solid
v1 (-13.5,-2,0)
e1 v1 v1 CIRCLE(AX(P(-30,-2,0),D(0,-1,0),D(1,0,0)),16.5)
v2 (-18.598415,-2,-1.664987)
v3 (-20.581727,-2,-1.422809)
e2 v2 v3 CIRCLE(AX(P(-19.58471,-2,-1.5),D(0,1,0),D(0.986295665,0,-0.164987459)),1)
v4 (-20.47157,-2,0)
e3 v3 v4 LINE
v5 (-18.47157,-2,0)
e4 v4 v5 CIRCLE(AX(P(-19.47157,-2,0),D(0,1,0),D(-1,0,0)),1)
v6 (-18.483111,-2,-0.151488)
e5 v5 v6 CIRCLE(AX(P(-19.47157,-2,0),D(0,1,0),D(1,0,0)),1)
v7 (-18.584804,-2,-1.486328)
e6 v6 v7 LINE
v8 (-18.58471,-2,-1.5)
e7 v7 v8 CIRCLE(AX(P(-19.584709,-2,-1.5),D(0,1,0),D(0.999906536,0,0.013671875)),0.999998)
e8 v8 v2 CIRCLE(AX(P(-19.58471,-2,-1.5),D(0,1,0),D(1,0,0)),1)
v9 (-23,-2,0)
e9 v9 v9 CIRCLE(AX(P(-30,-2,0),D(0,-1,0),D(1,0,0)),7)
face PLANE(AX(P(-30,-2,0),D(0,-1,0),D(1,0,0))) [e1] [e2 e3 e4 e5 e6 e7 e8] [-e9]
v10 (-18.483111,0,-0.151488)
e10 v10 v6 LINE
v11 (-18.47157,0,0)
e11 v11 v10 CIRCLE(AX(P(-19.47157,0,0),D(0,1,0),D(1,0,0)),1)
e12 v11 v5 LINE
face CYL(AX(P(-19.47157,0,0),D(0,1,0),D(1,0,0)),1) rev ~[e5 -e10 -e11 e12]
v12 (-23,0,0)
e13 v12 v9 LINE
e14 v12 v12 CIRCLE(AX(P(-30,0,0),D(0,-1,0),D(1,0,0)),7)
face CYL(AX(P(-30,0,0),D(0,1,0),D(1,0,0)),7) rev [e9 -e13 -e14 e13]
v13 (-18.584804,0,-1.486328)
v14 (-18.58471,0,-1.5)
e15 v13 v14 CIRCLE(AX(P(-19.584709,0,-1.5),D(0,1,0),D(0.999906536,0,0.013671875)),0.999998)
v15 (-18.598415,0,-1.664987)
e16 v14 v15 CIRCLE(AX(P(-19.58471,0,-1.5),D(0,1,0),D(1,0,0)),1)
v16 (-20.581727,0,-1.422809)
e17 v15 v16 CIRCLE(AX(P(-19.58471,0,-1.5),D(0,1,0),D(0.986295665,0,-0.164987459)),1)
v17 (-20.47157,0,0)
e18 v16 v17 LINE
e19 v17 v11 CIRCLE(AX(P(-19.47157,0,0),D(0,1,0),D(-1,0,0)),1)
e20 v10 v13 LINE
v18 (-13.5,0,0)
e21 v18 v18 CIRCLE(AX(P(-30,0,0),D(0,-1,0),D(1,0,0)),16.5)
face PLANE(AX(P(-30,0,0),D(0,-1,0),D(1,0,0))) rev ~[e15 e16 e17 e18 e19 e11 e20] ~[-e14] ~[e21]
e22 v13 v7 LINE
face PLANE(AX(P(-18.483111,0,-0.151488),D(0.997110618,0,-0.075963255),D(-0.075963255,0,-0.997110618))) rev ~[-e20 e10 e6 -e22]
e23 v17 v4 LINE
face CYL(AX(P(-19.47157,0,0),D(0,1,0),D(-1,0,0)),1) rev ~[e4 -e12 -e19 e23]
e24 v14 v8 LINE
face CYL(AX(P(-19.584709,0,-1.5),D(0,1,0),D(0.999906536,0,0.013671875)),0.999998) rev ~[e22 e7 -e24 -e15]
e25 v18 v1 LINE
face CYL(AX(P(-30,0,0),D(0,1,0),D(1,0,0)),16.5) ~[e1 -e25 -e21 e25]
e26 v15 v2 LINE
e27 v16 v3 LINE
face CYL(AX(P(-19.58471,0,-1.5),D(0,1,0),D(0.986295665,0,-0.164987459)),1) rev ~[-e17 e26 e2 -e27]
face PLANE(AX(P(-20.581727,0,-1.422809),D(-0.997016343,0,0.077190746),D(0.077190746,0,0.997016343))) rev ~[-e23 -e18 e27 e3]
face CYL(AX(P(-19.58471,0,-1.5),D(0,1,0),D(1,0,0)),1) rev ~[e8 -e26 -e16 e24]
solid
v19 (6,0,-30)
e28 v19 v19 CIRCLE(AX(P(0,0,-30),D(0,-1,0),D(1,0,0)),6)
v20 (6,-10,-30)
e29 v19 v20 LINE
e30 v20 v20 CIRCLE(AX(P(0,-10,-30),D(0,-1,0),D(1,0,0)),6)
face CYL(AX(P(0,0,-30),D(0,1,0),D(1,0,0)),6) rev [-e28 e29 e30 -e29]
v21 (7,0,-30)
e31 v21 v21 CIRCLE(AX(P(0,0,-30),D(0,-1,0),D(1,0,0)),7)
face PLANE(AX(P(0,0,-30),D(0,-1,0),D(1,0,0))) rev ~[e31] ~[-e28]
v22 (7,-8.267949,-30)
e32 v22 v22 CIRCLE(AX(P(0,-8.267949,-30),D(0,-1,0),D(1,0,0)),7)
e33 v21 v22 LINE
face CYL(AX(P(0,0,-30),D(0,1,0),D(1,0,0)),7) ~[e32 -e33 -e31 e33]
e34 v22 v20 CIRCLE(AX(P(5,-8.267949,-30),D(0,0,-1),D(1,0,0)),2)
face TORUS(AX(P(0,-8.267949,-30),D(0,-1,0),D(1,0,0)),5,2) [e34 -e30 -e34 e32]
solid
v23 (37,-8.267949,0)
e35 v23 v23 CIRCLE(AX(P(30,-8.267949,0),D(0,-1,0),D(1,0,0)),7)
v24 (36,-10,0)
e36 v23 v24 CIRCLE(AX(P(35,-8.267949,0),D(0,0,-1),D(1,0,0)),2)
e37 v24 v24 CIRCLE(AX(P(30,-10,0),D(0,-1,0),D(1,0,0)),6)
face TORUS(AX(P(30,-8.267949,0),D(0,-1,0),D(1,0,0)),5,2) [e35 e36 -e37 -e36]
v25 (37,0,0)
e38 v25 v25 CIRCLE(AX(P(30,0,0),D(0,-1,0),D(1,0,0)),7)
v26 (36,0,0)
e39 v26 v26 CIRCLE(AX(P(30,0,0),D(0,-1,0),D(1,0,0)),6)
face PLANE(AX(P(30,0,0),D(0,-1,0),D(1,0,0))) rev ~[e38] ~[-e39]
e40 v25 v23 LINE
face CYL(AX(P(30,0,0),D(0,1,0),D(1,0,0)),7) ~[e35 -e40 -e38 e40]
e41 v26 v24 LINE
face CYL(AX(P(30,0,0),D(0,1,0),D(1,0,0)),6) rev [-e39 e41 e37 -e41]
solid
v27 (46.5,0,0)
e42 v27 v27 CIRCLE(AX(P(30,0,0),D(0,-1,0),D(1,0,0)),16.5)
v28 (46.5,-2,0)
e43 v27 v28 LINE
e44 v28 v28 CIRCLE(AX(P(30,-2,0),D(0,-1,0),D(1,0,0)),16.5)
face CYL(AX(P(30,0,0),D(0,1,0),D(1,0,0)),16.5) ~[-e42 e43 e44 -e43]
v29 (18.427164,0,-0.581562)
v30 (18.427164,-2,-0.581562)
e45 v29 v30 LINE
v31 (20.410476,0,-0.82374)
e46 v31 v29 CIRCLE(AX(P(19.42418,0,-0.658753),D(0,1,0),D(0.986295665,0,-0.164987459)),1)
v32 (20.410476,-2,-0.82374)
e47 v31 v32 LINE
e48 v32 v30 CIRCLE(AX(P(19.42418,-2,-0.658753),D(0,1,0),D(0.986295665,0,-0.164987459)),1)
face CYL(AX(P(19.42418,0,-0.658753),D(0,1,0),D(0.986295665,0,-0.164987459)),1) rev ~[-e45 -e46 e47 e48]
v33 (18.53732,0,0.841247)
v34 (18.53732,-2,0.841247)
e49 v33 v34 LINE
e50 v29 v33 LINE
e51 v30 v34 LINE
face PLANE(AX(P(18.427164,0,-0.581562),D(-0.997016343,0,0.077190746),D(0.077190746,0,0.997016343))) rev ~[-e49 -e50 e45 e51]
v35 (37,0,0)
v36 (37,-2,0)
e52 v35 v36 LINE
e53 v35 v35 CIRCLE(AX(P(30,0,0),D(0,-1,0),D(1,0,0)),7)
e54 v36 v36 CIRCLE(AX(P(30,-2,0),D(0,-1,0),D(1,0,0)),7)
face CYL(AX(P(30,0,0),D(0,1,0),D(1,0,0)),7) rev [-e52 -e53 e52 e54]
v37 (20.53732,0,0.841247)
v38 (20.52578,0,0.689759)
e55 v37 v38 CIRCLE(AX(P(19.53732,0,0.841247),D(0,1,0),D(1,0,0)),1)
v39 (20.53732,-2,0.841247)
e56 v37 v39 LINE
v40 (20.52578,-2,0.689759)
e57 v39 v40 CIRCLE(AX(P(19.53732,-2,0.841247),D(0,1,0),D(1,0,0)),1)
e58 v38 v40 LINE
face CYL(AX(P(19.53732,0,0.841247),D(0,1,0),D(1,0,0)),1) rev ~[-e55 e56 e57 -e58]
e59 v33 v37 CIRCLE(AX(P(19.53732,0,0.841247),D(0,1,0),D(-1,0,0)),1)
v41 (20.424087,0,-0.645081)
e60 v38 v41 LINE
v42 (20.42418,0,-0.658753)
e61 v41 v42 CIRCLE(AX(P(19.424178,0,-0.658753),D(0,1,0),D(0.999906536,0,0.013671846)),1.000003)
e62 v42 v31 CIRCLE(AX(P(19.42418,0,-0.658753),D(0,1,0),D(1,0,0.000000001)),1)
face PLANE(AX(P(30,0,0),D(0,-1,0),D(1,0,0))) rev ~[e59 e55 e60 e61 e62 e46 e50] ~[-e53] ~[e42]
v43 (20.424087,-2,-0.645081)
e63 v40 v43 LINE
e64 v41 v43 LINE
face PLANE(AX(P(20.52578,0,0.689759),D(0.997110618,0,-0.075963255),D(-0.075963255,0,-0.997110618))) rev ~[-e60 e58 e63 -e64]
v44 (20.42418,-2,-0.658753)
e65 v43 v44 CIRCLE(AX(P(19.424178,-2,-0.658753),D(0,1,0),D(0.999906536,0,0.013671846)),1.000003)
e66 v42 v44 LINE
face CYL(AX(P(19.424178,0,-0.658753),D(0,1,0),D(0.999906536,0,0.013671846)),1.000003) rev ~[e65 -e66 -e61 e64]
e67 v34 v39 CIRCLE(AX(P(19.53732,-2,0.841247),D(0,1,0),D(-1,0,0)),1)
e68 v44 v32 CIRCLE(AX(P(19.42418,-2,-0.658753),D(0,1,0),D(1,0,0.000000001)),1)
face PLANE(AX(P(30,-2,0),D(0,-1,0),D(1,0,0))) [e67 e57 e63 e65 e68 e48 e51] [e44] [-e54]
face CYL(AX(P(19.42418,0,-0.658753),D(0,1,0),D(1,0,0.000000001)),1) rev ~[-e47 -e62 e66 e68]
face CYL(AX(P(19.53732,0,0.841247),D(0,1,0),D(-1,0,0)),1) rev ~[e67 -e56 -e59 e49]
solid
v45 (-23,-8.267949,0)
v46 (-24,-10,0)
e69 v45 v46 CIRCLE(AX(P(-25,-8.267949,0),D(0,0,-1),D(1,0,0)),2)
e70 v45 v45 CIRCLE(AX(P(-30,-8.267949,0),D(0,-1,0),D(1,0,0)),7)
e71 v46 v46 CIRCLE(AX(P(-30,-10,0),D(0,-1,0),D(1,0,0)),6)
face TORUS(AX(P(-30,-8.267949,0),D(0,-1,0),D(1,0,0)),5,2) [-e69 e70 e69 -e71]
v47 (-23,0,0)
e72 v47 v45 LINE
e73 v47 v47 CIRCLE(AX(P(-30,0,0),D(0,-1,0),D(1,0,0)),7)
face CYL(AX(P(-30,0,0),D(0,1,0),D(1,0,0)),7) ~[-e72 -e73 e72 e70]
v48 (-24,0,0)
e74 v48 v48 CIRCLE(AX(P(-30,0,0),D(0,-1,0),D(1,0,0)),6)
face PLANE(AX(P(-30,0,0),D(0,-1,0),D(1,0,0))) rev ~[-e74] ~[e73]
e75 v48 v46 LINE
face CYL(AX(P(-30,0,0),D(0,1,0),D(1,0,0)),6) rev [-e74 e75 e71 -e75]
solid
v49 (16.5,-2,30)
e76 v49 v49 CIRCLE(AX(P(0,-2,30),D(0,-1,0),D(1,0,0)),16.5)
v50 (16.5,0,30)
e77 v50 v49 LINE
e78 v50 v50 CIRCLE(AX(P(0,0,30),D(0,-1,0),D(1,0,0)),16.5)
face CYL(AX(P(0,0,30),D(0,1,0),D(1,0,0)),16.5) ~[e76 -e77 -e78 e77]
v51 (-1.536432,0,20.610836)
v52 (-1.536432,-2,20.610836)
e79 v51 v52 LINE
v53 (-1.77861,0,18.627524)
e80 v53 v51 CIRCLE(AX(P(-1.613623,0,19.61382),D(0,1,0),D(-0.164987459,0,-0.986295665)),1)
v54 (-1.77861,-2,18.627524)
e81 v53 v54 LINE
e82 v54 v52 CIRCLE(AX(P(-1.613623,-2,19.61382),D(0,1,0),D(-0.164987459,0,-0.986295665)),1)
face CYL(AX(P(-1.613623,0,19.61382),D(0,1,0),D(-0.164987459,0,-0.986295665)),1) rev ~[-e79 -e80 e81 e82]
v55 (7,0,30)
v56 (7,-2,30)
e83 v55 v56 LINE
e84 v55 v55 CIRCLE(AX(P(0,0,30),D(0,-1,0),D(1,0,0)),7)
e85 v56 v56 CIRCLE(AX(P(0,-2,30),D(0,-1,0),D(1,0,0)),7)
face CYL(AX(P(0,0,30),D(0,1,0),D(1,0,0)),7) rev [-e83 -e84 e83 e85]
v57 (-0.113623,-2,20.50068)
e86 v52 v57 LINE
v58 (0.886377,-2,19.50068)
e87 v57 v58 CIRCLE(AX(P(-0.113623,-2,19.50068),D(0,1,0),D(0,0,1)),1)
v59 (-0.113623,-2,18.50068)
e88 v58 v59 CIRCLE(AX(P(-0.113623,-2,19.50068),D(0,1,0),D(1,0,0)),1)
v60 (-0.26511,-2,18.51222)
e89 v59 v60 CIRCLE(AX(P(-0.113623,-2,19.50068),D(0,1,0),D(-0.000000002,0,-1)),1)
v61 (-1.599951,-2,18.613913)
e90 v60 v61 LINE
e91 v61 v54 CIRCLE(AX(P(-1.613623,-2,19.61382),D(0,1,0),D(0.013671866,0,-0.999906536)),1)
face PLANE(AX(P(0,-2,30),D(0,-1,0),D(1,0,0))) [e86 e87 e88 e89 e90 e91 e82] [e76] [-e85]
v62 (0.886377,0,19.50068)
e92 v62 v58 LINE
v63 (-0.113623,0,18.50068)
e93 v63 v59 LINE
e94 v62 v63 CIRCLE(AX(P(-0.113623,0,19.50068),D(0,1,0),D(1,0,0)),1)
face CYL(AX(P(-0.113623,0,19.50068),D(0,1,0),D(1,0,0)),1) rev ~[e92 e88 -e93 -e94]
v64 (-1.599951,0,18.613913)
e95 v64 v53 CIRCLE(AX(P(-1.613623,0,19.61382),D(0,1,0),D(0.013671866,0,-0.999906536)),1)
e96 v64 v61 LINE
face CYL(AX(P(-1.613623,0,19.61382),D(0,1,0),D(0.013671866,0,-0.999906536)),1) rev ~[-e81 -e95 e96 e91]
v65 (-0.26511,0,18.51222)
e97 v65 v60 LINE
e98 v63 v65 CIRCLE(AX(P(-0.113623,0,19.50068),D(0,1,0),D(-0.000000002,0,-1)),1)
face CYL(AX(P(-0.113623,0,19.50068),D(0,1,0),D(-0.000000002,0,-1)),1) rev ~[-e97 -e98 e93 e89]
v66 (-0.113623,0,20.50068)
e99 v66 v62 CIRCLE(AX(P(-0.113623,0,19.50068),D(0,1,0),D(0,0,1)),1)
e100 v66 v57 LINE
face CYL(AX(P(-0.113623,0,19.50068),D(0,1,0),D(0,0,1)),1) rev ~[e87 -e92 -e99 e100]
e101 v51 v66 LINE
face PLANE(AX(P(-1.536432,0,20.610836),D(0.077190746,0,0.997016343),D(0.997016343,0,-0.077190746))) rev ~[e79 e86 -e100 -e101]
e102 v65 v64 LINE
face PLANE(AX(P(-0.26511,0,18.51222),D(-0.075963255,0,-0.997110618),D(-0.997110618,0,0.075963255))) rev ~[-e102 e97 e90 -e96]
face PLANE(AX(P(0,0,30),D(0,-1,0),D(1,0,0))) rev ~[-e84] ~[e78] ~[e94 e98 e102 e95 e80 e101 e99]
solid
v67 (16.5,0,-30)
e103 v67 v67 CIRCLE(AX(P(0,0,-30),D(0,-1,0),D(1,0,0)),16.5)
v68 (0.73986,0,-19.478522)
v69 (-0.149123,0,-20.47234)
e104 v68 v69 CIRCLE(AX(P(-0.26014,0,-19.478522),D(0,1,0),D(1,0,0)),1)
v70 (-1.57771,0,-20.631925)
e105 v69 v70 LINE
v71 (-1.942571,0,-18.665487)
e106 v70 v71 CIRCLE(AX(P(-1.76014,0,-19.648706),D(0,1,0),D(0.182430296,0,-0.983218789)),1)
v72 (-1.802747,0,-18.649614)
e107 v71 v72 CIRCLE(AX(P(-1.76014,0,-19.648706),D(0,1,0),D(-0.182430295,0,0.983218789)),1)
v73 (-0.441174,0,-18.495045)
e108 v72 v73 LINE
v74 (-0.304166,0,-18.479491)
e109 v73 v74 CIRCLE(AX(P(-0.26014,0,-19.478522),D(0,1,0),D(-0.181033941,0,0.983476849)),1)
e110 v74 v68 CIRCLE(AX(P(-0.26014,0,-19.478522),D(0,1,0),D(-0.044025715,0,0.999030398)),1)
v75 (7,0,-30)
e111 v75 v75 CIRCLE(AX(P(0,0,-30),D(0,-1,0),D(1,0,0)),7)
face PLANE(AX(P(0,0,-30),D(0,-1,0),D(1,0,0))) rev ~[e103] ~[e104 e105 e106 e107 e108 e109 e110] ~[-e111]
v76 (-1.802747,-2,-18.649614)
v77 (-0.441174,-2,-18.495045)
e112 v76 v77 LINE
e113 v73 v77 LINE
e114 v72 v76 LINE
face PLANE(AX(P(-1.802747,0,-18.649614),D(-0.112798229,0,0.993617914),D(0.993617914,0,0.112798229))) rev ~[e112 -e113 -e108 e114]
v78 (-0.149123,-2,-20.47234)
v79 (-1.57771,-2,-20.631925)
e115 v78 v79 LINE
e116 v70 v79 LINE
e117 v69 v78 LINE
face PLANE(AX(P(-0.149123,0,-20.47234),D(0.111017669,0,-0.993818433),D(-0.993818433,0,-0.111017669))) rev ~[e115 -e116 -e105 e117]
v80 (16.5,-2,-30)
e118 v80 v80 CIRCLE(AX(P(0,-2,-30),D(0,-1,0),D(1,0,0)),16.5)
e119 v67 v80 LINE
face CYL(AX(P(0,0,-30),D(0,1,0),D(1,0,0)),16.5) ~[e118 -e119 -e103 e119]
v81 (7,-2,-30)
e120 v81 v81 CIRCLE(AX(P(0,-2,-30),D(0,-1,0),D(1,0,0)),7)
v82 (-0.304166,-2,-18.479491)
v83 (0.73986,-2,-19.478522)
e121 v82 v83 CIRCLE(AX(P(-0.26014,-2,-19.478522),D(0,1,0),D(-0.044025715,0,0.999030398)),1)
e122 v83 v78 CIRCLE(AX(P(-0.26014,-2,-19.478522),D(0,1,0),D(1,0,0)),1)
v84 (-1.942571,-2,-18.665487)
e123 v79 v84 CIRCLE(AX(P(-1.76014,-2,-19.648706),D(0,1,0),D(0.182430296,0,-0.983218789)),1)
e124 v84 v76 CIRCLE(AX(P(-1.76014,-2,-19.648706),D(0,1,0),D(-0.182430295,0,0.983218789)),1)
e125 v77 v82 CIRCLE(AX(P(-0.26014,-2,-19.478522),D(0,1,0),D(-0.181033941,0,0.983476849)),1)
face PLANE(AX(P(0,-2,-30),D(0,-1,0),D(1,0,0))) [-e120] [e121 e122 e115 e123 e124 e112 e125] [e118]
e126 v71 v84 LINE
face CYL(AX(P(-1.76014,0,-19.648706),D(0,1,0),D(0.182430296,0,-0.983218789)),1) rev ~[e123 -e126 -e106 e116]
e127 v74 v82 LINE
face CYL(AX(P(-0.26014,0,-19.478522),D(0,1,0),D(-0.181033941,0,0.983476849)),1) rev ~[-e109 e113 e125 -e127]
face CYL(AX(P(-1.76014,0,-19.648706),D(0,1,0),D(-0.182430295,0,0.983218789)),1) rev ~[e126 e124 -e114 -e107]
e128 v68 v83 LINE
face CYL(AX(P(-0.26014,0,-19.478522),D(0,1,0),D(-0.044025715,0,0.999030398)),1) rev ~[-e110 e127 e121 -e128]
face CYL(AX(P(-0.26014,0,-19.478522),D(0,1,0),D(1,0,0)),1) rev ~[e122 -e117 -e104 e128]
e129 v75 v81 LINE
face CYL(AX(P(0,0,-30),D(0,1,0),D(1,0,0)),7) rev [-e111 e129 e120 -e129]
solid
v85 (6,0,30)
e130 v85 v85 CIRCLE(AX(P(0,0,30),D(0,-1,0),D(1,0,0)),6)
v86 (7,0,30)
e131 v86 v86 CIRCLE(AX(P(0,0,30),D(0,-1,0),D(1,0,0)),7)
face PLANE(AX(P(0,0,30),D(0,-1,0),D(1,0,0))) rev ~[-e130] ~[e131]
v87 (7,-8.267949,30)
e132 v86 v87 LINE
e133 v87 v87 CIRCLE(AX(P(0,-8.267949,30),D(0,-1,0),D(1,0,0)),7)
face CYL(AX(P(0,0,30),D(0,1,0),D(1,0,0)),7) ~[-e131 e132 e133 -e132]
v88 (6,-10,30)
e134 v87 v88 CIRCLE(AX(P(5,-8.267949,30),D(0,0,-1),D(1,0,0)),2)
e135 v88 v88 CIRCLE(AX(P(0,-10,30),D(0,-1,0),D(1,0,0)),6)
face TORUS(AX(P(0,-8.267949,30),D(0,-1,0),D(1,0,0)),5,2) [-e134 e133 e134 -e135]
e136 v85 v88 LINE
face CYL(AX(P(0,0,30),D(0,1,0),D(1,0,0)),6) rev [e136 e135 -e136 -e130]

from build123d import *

# Parameters (mm, degrees)
F0_R     = 7
F0_R_2   = 6
F1_DEPTH = 10
F0_R_3   = 16.5
F0_R_4   = 12.5
F2_DEPTH = 2


# Not quite as in the source:
# - a fillet or chamfer that OpenCascade refuses, or shapes differently, is made with other operations: its cross-section is extruded or revolved along the edge and cut away or added


with BuildPart() as f1:
    # F0 (on Front) → F1 (new body)
    with BuildSketch(Plane.XZ):
        with Locations((-30, 0)):
            Circle(F0_R)
        with Locations((-30, 0)):
            Circle(F0_R_2, mode=Mode.SUBTRACT)
    extrude(amount=F1_DEPTH)

    # F3: fillet of radius 2 on 1 edges, made by hand

    # F3_s1 → F3_t2 (revolve, cut)
    with BuildSketch(Plane.XY):
        with BuildLine():
            ThreePointArc((-23, -8.2679491924), (-23.2679491924, -9.2679491924), (-24, -10))
            Line((-24, -10), (-23, -10))
            Line((-23, -10), (-23, -8.2679491924))
        make_face()
    revolve(axis=Axis((-30, -10, 0), (0, -1, 0)), mode=Mode.SUBTRACT)


with BuildPart() as f1b:
    # F0 (on Front) → F1, piece 2 (new body)
    with BuildSketch(Plane.XZ):
        with Locations((0, 30)):
            Circle(F0_R)
        with Locations((0, 30)):
            Circle(F0_R_2, mode=Mode.SUBTRACT)
    extrude(amount=F1_DEPTH)

    # F3#2: fillet of radius 2 on 1 edges, made by hand

    # F3_2_s1 → F3_2_t2 (revolve, cut)
    with BuildSketch(Plane.XY.offset(30)):
        with BuildLine():
            ThreePointArc((7, -8.2679491924), (6.7320508076, -9.2679491924), (6, -10))
            Line((6, -10), (7, -10))
            Line((7, -10), (7, -8.2679491924))
        make_face()
    revolve(axis=Axis((0, -10, 30), (0, -1, 0)), mode=Mode.SUBTRACT)


with BuildPart() as f1c:
    # F0 (on Front) → F1, piece 3 (new body)
    with BuildSketch(Plane.XZ):
        with Locations((30, 0)):
            Circle(F0_R)
        with Locations((30, 0)):
            Circle(F0_R_2, mode=Mode.SUBTRACT)
    extrude(amount=F1_DEPTH)

    # F3#3: fillet of radius 2 on 1 edges, made by hand

    # F3_3_s1 → F3_3_t2 (revolve, cut)
    with BuildSketch(Plane.XY):
        with BuildLine():
            ThreePointArc((37, -8.2679491924), (36.7320508076, -9.2679491924), (36, -10))
            Line((36, -10), (37, -10))
            Line((37, -10), (37, -8.2679491924))
        make_face()
    revolve(axis=Axis((30, -10, 0), (0, -1, 0)), mode=Mode.SUBTRACT)


with BuildPart() as f1d:
    # F0 (on Front) → F1, piece 4 (new body)
    with BuildSketch(Plane.XZ):
        with Locations((0, -30)):
            Circle(F0_R)
        with Locations((0, -30)):
            Circle(F0_R_2, mode=Mode.SUBTRACT)
    extrude(amount=F1_DEPTH)

    # F3#4: fillet of radius 2 on 1 edges, made by hand

    # F3_4_s1 → F3_4_t2 (revolve, cut)
    with BuildSketch(Plane.XY.offset(-30)):
        with BuildLine():
            ThreePointArc((7, -8.2679491924), (6.7320508076, -9.2679491924), (6, -10))
            Line((6, -10), (7, -10))
            Line((7, -10), (7, -8.2679491924))
        make_face()
    revolve(axis=Axis((0, -10, -30), (0, -1, 0)), mode=Mode.SUBTRACT)


with BuildPart() as f2:
    # F0 (on Front) → F2 (new body)
    with BuildSketch(Plane.XZ):
        with Locations((-30, 0)):
            Circle(F0_R_3)
        with Locations((-30, 0)):
            Circle(F0_R_4, mode=Mode.SUBTRACT)
        with Locations((-30, 0)):
            Circle(F0_R_4)
        with BuildLine():
            ThreePointArc((-20.4715704369, 0), (-19.4715704369, 1), (-18.4715704369, 0))
            ThreePointArc((-18.4715704369, 0), (-18.4744598192, -0.0759632549), (-18.4831112691, -0.151487536))
            Line((-18.4831112691, -0.151487536), (-18.5848039346, -1.4863281334))
            ThreePointArc((-18.5848039346, -1.4863281334), (-18.5847338366, -1.493163907), (-18.5847104703, -1.5))
            ThreePointArc((-18.5847104703, -1.5), (-18.5881424433, -1.5827778208), (-18.5984148055, -1.6649874592))
            ThreePointArc((-18.5984148055, -1.6649874592), (-19.7059181598, -2.4926271687), (-20.5817268135, -1.4228092539))
            Line((-20.5817268135, -1.4228092539), (-20.4715704369, 0))
        make_face(mode=Mode.SUBTRACT)
        with Locations((-30, 0)):
            Circle(F0_R, mode=Mode.SUBTRACT)
    extrude(amount=F2_DEPTH)


with BuildPart() as f2b:
    # F0 (on Front) → F2, piece 2 (new body)
    with BuildSketch(Plane.XZ):
        with Locations((0, 30)):
            Circle(F0_R_3)
        with Locations((0, 30)):
            Circle(F0_R_4, mode=Mode.SUBTRACT)
        with Locations((0, 30)):
            Circle(F0_R_4)
        with BuildLine():
            ThreePointArc((-0.1136225039, 20.5006795018), (0.5934842773, 20.207786283), (0.8863774961, 19.5006795018))
            ThreePointArc((0.8863774961, 19.5006795018), (0.5934842773, 18.7935727207), (-0.1136225039, 18.5006795018))
            ThreePointArc((-0.1136225039, 18.5006795018), (-0.1895857587, 18.5035688842), (-0.2651100399, 18.512220334))
            Line((-0.2651100399, 18.512220334), (-1.5999506373, 18.6139129995))
            ThreePointArc((-1.5999506373, 18.6139129995), (-1.6895857587, 18.6167089175), (-1.7786099631, 18.6275238705))
            ThreePointArc((-1.7786099631, 18.6275238705), (-2.6062496725, 19.7350272248), (-1.5364317578, 20.6108358785))
            Line((-1.5364317578, 20.6108358785), (-0.1136225039, 20.5006795018))
        make_face(mode=Mode.SUBTRACT)
        with Locations((0, 30)):
            Circle(F0_R, mode=Mode.SUBTRACT)
    extrude(amount=F2_DEPTH)


with BuildPart() as f2c:
    # F0 (on Front) → F2, piece 3 (new body)
    with BuildSketch(Plane.XZ):
        with Locations((30, 0)):
            Circle(F0_R_3)
        with Locations((30, 0)):
            Circle(F0_R_4, mode=Mode.SUBTRACT)
        with Locations((30, 0)):
            Circle(F0_R_4)
        with BuildLine():
            ThreePointArc((18.5373204914, 0.8412470011), (19.5373204914, 1.8412470011), (20.5373204914, 0.8412470011))
            ThreePointArc((20.5373204914, 0.8412470011), (20.5344311091, 0.7652837462), (20.5257796592, 0.6897594651))
            Line((20.5257796592, 0.6897594651), (20.4240869937, -0.6450811323))
            ThreePointArc((20.4240869937, -0.6450811323), (20.4241570916, -0.6519169059), (20.424180458, -0.6587529989))
            ThreePointArc((20.424180458, -0.6587529989), (20.420748485, -0.7415308198), (20.4104761228, -0.8237404581))
            ThreePointArc((20.4104761228, -0.8237404581), (19.3029727684, -1.6513801676), (18.4271641147, -0.5815622529))
            Line((18.4271641147, -0.5815622529), (18.5373204914, 0.8412470011))
        make_face(mode=Mode.SUBTRACT)
        with Locations((30, 0)):
            Circle(F0_R, mode=Mode.SUBTRACT)
    extrude(amount=F2_DEPTH)


with BuildPart() as f2d:
    # F0 (on Front) → F2, piece 4 (new body)
    with BuildSketch(Plane.XZ):
        with Locations((0, -30)):
            Circle(F0_R_3)
        with Locations((0, -30)):
            Circle(F0_R_4, mode=Mode.SUBTRACT)
        with Locations((0, -30)):
            Circle(F0_R_4)
        with BuildLine():
            ThreePointArc((-1.5777100629, -20.6319249065), (-2.7433591479, -19.8311364135), (-1.9425706549, -18.6654873284))
            ThreePointArc((-1.9425706549, -18.6654873284), (-1.8729385877, -18.6550882032), (-1.8027474061, -18.64961421))
            Line((-1.8027474061, -18.64961421), (-0.4411743003, -18.4950446993))
            ThreePointArc((-0.4411743003, -18.4950446993), (-0.3729385877, -18.4849036338), (-0.3041660736, -18.4794911499))
            ThreePointArc((-0.3041660736, -18.4794911499), (0.4312257834, -18.7560169755), (0.7398596411, -19.4785215481))
            ThreePointArc((0.7398596411, -19.4785215481), (0.4851842917, -20.1452232545), (-0.1491226894, -20.4723399807))
            Line((-0.1491226894, -20.4723399807), (-1.5777100629, -20.6319249065))
        make_face(mode=Mode.SUBTRACT)
        with Locations((0, -30)):
            Circle(F0_R, mode=Mode.SUBTRACT)
    extrude(amount=F2_DEPTH)


solid = Compound([f1.part, f1b.part, f1c.part, f1d.part, f2.part, f2b.part, f2c.part, f2d.part])
